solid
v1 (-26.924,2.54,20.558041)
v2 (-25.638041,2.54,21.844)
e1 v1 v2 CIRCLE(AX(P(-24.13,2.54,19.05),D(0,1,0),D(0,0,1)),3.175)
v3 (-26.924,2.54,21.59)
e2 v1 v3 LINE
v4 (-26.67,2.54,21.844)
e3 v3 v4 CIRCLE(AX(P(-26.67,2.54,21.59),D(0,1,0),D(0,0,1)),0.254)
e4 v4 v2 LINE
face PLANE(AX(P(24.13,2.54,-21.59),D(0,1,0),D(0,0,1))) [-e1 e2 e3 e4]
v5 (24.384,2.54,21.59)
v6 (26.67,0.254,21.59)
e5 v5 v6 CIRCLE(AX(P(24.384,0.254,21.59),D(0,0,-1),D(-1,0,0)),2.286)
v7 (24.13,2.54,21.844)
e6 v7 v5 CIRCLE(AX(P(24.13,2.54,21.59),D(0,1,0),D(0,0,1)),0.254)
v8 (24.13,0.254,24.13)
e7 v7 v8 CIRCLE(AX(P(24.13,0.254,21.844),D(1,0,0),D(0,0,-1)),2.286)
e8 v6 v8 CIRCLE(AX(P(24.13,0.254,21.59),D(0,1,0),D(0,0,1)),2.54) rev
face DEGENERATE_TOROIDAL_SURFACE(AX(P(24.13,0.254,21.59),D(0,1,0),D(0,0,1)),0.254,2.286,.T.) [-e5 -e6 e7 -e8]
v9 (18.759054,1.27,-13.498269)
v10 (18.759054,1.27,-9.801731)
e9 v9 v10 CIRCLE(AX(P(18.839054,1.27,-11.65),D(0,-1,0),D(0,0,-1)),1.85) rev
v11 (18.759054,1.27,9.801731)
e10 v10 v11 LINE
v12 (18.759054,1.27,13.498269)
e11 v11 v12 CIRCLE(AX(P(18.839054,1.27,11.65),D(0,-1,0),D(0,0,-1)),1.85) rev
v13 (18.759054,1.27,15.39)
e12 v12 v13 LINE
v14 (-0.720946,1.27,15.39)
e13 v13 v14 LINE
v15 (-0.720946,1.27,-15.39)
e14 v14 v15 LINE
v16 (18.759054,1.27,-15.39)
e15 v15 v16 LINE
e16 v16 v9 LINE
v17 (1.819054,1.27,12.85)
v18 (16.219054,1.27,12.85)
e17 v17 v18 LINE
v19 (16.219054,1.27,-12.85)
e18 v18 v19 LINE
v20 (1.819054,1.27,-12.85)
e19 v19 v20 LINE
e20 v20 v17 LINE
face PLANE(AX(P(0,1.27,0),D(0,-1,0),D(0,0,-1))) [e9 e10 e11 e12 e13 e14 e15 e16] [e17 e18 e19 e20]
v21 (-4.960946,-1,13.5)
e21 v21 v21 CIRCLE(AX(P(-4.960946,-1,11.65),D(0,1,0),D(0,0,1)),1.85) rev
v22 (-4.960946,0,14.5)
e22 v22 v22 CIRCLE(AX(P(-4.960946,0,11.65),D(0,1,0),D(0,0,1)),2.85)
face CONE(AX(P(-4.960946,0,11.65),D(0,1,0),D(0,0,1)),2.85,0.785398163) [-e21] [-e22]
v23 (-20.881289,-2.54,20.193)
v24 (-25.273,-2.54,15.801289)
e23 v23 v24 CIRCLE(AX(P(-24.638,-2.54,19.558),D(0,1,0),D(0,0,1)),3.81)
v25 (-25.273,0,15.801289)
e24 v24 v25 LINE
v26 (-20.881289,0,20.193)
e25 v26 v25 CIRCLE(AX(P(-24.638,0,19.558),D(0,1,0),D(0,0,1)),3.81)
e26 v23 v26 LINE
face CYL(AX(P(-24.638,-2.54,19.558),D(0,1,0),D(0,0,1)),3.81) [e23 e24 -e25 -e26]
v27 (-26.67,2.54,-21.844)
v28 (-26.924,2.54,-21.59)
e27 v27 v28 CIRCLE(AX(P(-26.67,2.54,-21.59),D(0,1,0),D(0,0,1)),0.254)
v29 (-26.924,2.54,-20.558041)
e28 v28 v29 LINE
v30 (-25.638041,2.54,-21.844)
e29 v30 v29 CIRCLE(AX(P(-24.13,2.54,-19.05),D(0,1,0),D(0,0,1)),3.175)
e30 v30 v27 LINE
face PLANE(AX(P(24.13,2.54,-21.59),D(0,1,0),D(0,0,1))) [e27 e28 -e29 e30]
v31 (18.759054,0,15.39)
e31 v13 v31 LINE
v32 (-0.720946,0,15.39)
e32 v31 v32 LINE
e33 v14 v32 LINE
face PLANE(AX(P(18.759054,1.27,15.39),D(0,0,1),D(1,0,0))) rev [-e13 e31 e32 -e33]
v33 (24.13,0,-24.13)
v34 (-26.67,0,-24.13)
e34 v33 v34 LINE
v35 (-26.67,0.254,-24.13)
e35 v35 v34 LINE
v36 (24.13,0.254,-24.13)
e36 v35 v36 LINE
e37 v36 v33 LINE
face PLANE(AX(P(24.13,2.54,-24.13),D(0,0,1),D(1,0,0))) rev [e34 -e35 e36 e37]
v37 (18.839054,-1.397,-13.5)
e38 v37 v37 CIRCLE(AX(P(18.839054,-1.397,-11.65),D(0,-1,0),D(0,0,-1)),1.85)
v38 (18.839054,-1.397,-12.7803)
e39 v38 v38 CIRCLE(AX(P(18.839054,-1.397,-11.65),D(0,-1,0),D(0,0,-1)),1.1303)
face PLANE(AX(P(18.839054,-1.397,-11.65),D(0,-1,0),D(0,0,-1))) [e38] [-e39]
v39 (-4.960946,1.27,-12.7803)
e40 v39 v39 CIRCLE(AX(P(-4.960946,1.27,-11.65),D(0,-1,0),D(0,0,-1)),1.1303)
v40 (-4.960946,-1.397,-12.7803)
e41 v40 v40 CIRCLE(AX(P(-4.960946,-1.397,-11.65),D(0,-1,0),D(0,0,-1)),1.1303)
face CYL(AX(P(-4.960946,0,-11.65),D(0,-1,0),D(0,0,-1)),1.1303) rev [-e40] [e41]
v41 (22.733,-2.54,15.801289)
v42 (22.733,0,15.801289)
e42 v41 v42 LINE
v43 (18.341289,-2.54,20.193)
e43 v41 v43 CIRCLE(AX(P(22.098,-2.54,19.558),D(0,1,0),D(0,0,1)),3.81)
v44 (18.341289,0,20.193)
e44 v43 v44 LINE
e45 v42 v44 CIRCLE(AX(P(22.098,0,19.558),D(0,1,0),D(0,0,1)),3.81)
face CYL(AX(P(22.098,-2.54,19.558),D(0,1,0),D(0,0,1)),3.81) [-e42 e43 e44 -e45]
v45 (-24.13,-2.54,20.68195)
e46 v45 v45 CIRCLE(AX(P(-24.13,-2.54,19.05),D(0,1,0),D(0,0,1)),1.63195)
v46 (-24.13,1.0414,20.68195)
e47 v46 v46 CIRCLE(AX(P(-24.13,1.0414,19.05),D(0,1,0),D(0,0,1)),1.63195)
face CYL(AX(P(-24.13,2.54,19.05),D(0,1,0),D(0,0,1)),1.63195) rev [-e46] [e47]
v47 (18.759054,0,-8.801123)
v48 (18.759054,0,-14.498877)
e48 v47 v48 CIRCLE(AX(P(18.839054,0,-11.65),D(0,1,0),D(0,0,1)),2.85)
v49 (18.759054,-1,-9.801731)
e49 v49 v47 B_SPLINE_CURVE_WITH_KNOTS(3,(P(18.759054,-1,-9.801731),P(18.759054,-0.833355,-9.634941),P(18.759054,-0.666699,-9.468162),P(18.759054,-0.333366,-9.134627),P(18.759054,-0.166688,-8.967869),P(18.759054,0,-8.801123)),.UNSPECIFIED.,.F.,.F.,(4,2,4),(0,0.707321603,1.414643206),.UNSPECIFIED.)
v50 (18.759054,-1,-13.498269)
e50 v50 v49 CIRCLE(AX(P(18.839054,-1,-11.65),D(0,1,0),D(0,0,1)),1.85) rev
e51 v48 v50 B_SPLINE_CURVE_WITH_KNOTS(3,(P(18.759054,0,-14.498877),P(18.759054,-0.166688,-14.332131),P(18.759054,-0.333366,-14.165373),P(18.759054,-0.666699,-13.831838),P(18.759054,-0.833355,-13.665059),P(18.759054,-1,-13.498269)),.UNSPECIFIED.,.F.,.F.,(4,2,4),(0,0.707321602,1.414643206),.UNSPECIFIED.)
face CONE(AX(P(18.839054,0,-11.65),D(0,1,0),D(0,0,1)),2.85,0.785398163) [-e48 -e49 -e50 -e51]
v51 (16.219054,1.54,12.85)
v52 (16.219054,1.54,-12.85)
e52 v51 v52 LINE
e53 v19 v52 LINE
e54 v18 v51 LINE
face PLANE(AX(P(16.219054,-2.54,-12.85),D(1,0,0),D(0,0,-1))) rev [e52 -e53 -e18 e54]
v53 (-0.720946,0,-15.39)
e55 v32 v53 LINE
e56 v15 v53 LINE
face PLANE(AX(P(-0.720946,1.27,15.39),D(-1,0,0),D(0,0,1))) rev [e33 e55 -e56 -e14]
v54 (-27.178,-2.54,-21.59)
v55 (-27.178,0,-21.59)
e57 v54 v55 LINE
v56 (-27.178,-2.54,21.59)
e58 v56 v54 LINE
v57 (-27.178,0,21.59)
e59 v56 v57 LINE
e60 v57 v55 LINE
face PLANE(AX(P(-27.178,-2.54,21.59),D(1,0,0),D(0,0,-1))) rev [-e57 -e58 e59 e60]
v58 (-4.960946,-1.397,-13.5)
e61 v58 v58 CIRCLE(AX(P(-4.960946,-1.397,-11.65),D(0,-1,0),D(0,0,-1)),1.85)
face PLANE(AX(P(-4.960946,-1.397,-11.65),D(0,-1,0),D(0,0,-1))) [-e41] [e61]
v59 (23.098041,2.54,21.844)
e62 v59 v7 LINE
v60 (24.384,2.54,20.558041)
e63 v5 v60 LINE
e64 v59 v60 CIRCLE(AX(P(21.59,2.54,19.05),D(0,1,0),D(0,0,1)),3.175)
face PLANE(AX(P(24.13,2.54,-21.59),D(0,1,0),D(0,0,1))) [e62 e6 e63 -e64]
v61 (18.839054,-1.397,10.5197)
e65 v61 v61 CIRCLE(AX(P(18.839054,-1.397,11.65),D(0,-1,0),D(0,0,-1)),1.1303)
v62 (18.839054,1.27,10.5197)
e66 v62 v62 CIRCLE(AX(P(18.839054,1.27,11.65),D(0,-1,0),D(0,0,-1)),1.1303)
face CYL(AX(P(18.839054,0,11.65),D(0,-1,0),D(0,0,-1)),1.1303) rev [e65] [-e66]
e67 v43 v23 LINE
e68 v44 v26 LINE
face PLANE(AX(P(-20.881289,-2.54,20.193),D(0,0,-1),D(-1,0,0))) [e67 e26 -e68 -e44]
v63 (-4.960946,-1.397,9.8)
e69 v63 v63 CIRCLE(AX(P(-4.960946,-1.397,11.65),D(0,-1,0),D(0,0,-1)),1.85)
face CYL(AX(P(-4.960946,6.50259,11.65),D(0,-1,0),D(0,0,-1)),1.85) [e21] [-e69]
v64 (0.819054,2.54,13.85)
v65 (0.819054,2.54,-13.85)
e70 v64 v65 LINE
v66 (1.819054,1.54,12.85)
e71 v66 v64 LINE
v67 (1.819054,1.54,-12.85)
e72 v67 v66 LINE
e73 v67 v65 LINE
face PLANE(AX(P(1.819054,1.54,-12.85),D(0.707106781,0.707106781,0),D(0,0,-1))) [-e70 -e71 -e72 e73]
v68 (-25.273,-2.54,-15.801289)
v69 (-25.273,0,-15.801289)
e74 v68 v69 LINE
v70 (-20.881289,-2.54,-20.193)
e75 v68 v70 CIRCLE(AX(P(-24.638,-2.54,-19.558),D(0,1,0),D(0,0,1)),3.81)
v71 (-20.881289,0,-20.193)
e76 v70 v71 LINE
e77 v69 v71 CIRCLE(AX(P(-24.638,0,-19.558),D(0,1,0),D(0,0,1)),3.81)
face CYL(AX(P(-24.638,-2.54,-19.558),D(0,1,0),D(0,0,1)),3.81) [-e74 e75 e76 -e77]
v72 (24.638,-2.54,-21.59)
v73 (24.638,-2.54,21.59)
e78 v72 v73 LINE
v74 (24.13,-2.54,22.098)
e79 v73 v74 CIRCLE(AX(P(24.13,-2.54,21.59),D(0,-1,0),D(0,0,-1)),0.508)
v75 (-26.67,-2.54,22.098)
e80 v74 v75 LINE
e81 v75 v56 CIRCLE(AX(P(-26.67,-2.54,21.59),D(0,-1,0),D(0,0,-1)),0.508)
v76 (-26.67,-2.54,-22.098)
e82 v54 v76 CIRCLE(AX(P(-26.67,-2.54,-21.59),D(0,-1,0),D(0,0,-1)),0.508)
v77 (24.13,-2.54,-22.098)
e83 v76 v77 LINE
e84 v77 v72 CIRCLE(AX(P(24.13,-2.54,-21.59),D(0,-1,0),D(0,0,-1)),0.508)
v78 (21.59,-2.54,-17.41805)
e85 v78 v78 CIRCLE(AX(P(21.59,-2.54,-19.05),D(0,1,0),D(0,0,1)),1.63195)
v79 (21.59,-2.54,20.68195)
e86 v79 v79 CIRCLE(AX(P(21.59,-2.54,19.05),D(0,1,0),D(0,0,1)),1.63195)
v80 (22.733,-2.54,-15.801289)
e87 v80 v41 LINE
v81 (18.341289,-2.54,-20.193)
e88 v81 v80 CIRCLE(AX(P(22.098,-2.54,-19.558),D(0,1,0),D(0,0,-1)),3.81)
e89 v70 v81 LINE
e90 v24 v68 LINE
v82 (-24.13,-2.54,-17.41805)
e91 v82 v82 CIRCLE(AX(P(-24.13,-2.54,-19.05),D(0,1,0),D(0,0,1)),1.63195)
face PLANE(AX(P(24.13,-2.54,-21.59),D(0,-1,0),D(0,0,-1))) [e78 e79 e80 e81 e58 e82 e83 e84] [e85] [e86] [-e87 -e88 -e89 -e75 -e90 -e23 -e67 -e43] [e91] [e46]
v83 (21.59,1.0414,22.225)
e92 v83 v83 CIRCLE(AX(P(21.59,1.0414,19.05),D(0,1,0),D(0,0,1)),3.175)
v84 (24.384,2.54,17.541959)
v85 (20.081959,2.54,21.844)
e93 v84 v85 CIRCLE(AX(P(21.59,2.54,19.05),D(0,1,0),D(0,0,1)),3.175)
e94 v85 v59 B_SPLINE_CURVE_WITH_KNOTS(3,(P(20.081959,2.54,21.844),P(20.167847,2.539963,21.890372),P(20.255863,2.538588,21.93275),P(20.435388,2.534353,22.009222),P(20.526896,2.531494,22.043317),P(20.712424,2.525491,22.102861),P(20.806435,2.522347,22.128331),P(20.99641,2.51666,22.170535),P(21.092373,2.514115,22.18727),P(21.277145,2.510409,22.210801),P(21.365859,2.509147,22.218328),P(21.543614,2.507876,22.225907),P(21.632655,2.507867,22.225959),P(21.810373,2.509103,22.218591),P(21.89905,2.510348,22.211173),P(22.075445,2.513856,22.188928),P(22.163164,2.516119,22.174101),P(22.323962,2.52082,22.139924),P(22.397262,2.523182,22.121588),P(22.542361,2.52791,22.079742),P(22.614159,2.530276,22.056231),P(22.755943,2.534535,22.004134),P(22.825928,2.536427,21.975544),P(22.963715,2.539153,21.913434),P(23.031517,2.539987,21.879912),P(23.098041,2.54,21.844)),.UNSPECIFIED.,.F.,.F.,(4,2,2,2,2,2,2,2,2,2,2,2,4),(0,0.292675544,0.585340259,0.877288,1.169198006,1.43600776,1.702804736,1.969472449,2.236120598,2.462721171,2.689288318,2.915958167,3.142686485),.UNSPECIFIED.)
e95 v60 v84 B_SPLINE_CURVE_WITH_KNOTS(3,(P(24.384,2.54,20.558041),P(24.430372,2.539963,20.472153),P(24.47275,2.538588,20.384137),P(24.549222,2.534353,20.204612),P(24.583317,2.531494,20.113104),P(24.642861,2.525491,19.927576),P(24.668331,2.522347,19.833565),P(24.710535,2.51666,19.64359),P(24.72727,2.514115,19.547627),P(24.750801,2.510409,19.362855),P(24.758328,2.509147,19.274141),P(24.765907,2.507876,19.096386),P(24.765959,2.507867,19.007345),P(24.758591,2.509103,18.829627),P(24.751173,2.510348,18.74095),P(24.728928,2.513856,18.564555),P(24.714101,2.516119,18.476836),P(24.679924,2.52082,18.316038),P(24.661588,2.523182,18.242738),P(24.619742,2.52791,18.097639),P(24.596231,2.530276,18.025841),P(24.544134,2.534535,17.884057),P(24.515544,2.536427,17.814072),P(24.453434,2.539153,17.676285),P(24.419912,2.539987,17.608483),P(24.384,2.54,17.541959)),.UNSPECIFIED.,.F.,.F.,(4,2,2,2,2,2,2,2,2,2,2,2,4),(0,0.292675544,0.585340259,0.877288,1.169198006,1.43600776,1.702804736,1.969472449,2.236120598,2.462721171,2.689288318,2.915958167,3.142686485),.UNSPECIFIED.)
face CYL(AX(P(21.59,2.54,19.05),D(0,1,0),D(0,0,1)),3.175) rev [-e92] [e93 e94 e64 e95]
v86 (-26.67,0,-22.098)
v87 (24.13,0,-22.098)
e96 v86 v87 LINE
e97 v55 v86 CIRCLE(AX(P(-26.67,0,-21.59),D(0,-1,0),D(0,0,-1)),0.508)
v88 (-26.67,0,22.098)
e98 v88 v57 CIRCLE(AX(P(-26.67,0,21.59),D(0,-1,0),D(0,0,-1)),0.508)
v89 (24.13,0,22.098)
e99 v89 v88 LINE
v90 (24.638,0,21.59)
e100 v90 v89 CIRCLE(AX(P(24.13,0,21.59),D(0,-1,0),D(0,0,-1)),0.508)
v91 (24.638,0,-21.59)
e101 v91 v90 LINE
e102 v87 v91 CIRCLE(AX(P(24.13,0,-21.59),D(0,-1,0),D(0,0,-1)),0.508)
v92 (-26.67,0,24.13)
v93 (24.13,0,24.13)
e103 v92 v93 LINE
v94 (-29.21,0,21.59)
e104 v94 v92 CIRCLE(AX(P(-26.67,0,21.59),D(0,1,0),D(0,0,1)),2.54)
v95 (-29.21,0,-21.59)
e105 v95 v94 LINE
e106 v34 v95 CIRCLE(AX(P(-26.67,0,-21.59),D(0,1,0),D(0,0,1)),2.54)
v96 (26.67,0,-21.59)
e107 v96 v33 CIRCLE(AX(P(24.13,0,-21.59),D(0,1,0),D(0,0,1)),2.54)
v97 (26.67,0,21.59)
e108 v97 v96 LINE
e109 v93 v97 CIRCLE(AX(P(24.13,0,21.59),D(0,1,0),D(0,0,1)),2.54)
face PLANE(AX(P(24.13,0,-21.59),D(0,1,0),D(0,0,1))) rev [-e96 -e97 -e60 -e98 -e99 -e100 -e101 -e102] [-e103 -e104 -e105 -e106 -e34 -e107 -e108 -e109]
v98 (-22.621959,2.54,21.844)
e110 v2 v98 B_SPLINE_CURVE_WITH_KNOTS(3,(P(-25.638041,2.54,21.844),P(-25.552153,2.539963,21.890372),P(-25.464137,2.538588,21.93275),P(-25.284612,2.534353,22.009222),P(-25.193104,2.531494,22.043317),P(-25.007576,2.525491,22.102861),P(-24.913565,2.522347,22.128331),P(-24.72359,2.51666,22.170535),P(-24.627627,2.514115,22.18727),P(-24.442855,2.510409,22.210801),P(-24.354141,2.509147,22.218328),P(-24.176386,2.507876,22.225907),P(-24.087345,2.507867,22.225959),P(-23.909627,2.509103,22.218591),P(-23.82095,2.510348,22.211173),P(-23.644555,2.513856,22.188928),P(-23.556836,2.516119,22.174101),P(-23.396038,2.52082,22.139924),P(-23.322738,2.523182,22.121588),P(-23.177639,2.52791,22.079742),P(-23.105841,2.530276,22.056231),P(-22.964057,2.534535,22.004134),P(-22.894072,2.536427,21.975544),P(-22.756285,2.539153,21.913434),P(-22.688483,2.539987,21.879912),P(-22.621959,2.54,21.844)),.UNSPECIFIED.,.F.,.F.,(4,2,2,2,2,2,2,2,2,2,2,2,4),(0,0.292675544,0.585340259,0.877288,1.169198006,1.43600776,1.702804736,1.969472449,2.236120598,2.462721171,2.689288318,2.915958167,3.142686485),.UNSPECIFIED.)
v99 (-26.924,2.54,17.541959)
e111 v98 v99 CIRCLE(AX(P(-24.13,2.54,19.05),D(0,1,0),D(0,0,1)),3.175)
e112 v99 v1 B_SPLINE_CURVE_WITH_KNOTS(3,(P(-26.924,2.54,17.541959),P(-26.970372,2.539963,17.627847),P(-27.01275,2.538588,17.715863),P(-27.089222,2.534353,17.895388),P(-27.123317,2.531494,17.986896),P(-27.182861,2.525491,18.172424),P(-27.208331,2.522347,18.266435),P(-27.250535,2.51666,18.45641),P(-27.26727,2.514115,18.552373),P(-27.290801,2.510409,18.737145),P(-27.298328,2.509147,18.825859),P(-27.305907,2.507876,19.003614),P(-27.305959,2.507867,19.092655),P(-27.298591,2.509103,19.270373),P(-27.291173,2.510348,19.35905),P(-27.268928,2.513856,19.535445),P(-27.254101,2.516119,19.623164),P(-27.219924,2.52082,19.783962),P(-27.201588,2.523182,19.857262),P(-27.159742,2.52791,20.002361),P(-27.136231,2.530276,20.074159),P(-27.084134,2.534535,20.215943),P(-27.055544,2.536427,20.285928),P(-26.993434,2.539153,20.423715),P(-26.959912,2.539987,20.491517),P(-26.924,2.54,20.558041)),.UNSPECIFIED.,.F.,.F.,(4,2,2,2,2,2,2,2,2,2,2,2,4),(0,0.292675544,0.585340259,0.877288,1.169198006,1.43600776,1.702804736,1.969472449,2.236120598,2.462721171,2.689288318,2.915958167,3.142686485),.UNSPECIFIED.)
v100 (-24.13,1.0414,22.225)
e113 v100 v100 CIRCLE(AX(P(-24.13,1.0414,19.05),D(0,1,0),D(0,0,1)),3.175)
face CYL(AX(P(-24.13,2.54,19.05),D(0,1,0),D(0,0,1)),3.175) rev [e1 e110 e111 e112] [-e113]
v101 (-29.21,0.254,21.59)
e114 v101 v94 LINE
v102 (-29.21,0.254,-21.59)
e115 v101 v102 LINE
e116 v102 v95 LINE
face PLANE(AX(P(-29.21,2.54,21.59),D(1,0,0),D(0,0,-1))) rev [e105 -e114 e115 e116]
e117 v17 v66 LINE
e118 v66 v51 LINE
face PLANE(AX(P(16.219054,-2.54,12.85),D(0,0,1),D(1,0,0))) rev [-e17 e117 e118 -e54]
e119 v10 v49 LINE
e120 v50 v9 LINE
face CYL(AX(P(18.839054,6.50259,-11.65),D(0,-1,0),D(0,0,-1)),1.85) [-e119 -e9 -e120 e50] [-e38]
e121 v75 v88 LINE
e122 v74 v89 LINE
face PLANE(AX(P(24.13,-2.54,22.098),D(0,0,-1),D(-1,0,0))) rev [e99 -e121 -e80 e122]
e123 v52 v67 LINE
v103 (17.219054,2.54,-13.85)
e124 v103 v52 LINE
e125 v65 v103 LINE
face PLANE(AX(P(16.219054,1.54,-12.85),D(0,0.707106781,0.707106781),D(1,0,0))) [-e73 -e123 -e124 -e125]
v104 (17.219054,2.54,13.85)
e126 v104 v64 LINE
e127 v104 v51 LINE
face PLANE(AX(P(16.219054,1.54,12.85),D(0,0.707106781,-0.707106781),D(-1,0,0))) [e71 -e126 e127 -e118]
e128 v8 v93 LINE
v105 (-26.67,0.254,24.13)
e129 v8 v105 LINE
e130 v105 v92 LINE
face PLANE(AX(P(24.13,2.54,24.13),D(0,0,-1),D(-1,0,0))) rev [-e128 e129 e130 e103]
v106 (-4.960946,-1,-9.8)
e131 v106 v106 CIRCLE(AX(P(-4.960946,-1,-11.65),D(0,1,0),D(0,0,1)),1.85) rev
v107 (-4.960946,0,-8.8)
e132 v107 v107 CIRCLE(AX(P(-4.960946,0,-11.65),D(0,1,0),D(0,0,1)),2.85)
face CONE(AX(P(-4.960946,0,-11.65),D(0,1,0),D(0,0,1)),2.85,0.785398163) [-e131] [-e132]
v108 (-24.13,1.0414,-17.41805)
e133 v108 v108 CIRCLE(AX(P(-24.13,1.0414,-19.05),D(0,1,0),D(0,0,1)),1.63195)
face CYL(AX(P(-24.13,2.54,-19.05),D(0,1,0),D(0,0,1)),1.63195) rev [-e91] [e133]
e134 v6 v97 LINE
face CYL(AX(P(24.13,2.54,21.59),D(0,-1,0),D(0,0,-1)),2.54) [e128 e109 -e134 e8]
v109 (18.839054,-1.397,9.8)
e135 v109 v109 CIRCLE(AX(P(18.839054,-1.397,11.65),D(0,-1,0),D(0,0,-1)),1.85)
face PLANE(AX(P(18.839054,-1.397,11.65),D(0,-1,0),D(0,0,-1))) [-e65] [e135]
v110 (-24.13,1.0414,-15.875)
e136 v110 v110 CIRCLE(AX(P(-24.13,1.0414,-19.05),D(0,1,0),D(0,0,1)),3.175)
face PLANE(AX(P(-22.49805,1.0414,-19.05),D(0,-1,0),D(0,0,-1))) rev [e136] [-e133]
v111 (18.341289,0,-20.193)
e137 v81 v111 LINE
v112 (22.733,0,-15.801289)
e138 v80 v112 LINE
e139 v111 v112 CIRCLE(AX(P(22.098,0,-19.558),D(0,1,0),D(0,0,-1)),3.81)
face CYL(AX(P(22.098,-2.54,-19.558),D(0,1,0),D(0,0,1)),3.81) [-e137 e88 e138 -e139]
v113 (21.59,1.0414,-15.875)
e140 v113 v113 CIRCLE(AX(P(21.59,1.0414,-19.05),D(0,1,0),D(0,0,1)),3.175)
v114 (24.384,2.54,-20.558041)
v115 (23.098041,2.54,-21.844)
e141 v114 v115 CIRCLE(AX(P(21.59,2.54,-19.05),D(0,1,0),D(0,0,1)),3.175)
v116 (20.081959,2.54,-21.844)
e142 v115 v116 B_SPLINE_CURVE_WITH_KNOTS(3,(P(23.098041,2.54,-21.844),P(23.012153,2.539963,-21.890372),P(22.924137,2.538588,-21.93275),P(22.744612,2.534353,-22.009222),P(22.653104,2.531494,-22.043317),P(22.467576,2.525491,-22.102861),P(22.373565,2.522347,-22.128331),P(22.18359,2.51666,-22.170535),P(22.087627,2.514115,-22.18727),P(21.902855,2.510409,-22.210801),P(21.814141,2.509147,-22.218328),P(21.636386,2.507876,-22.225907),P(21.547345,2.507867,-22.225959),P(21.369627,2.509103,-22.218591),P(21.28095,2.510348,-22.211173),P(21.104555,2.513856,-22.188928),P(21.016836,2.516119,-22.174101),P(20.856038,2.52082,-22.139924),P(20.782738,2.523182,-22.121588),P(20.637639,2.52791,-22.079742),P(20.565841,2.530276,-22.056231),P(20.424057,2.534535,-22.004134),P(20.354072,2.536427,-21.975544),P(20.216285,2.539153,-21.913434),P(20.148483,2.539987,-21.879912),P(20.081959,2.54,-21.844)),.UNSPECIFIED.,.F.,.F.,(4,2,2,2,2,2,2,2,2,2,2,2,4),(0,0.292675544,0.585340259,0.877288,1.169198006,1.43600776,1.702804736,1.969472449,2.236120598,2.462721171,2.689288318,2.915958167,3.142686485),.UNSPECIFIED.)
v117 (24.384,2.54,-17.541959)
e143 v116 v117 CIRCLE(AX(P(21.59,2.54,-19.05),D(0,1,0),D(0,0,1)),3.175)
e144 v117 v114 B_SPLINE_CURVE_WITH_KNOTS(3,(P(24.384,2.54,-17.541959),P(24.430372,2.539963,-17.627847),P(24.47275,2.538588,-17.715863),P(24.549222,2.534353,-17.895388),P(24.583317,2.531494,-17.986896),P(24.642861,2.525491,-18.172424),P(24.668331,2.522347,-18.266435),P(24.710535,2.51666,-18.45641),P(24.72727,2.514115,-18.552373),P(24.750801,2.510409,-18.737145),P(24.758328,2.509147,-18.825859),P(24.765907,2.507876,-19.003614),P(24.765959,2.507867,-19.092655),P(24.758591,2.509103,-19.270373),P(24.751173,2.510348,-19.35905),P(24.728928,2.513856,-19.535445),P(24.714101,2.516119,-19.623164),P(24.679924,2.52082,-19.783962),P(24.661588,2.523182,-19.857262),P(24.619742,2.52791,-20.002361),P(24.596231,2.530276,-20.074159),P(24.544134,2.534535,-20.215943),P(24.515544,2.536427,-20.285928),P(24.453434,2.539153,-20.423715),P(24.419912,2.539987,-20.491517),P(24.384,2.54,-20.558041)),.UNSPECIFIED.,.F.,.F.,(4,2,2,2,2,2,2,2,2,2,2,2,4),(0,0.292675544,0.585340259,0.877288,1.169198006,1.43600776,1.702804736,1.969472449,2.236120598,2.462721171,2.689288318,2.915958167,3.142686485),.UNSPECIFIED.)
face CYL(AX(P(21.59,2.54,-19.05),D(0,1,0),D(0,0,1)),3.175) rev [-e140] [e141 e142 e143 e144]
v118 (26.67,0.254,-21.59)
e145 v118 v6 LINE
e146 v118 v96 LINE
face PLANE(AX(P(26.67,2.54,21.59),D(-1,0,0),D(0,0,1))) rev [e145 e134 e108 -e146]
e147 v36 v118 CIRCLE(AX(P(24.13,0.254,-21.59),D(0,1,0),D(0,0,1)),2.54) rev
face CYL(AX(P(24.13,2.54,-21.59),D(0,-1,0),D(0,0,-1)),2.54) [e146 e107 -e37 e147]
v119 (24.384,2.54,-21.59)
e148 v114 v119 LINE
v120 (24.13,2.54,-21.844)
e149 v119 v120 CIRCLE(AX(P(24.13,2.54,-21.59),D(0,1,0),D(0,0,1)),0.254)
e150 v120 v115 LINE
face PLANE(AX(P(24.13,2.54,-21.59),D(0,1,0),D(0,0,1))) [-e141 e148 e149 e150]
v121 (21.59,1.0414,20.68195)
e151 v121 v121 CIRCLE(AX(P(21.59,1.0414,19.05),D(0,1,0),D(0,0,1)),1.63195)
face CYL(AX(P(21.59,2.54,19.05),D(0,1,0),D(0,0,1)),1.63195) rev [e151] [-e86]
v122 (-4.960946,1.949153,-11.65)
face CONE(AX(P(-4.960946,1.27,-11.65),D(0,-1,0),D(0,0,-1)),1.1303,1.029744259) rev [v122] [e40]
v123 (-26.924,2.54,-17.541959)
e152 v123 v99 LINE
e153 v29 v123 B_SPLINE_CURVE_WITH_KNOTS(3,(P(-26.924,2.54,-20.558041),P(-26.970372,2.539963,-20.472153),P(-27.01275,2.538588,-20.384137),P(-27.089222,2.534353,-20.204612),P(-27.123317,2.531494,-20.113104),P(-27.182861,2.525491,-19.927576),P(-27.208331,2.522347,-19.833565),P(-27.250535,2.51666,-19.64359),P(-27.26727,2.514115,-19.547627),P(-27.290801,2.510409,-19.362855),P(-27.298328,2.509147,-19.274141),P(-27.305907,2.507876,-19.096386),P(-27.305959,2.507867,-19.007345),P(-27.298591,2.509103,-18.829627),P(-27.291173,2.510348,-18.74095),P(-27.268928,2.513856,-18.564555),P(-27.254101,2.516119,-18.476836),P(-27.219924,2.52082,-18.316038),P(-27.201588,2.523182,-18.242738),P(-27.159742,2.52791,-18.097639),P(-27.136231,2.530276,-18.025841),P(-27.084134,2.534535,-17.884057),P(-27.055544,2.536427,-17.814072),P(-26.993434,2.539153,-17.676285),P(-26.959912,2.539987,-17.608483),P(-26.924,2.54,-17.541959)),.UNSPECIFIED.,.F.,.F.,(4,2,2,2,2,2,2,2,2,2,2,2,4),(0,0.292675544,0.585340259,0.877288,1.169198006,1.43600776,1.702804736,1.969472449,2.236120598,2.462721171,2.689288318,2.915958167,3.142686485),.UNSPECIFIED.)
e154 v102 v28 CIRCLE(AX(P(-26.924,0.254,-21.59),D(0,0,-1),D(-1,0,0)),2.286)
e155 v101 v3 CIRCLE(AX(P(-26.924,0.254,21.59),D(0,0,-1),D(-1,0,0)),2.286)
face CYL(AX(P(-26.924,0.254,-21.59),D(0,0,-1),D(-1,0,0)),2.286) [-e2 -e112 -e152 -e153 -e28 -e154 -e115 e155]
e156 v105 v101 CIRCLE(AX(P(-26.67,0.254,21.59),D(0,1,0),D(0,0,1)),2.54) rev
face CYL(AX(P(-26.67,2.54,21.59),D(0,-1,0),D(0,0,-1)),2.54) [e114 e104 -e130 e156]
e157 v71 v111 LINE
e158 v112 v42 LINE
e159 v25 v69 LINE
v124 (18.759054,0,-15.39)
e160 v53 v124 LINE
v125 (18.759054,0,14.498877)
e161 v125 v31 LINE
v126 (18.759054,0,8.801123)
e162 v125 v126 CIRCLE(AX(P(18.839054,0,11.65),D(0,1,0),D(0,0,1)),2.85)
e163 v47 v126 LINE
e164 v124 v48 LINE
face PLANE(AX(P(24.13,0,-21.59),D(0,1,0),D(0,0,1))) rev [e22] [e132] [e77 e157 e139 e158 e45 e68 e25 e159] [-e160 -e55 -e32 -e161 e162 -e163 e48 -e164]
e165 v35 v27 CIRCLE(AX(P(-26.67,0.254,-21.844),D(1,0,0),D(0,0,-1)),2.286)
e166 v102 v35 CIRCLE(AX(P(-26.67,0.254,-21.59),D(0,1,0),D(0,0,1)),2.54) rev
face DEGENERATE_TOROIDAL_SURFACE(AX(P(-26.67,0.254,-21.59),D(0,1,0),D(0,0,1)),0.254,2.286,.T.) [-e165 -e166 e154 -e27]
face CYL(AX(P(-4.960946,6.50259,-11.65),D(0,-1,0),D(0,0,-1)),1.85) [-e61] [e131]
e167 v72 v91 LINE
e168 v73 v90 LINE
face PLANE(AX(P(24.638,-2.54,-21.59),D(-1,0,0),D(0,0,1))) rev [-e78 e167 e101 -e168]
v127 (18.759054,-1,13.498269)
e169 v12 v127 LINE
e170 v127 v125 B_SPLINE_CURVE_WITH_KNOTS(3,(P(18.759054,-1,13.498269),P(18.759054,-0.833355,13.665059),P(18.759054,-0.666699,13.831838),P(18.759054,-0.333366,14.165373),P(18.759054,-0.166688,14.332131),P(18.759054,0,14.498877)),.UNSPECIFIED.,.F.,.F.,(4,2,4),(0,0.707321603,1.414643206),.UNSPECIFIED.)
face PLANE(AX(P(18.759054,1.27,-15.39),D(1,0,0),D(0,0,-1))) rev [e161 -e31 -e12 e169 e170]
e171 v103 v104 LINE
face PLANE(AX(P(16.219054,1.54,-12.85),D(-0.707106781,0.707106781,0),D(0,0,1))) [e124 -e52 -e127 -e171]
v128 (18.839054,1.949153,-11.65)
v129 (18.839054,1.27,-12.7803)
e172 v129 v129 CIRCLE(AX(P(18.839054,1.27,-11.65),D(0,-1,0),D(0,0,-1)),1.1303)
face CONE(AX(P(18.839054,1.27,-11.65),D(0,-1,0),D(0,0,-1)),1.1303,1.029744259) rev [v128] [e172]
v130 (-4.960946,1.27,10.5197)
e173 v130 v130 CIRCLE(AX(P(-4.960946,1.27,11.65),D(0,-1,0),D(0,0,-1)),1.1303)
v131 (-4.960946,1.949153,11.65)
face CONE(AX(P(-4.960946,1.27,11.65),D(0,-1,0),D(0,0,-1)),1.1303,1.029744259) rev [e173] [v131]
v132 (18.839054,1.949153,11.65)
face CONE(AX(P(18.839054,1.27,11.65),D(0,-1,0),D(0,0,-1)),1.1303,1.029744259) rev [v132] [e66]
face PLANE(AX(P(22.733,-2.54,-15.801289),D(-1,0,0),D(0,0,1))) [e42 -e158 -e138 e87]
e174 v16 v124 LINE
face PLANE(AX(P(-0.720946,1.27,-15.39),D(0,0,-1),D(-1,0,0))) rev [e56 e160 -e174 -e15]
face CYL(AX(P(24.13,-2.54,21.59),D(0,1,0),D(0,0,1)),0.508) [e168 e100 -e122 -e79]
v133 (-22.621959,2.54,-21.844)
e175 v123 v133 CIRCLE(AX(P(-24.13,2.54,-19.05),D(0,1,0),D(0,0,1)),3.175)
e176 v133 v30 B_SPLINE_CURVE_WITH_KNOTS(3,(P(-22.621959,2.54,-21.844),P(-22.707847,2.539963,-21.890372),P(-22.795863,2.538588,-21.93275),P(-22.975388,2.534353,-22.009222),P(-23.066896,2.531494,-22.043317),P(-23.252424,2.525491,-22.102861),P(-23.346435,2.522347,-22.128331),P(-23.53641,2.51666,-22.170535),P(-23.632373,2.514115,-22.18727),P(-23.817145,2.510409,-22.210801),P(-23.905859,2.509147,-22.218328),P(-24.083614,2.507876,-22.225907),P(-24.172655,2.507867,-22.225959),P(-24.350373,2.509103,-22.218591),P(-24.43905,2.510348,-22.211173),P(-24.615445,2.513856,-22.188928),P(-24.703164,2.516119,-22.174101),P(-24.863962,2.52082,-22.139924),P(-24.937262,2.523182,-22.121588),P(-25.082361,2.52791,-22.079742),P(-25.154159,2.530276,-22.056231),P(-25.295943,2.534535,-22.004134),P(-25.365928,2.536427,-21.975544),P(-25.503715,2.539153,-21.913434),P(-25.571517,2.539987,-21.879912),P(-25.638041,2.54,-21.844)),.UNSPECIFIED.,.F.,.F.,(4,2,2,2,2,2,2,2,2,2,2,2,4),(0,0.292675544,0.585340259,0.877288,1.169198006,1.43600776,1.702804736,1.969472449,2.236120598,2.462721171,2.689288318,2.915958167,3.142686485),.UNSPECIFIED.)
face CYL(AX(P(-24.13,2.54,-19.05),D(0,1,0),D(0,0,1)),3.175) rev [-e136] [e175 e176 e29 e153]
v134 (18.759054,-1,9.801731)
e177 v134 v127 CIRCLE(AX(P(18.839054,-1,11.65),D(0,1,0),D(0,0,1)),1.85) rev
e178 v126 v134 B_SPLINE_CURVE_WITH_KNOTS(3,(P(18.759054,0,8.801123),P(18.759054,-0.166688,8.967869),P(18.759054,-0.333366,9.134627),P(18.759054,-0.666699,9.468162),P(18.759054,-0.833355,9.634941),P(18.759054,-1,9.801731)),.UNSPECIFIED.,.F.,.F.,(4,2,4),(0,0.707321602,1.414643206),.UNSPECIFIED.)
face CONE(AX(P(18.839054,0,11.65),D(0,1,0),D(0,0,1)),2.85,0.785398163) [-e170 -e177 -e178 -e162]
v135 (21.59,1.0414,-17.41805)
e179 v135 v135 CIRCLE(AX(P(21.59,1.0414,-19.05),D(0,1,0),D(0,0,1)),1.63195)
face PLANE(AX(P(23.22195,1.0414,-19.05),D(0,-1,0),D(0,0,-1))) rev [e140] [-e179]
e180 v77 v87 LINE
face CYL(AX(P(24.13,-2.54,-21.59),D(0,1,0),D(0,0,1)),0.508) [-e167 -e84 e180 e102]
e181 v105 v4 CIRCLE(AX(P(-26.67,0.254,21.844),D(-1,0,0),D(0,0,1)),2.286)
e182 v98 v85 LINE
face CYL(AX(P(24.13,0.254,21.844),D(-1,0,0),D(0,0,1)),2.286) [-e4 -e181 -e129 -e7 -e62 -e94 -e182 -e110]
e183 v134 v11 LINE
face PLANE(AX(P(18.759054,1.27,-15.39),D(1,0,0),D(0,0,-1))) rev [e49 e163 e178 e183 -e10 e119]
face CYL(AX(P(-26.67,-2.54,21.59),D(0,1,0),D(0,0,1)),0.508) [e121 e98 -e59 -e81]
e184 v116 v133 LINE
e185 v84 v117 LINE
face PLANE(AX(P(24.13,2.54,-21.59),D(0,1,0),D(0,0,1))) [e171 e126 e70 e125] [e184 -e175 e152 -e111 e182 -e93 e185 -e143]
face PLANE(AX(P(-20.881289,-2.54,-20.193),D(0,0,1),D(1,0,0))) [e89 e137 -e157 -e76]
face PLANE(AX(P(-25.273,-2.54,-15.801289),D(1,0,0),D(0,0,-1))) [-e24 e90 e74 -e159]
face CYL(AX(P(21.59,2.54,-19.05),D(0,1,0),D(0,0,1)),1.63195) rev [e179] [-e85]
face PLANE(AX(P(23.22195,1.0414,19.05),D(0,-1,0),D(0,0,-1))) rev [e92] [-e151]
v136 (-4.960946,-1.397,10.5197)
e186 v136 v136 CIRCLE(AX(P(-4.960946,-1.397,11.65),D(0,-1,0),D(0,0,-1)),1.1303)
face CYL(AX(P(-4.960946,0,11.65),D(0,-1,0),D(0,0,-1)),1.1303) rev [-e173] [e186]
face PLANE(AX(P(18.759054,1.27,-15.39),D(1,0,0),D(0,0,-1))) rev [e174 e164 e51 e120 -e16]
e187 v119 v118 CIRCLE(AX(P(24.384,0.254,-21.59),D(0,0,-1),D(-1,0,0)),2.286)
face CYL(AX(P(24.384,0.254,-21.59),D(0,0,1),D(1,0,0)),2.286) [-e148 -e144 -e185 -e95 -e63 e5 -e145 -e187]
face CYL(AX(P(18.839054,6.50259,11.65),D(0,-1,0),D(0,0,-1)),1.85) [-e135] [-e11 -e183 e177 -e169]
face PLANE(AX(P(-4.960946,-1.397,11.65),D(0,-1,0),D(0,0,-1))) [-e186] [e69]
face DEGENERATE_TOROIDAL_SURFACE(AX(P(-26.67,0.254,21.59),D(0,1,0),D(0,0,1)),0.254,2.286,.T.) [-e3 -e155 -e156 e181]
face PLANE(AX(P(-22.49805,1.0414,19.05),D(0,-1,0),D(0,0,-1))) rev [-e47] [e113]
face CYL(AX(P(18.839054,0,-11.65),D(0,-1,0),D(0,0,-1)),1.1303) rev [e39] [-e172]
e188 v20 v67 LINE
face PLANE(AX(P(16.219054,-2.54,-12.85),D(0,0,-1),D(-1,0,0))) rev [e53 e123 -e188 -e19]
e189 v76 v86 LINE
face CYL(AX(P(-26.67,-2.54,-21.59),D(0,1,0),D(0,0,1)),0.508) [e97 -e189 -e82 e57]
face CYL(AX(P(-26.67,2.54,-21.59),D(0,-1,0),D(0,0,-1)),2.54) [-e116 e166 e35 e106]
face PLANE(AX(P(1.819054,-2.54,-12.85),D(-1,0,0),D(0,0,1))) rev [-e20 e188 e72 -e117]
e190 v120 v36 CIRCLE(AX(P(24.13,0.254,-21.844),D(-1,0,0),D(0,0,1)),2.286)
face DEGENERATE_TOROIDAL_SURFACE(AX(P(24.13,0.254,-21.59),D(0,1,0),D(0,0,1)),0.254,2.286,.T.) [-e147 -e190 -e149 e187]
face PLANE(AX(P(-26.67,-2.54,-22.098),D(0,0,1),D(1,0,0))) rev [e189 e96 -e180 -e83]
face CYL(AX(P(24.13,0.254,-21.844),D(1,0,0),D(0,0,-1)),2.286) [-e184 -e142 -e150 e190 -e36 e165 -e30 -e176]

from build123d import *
from build123d.topology import SkipClean

# Parameters (mm, degrees)
BOSS_EXTRUDE1_DEPTH                           = 2.54
BOSS_EXTRUDE2_DEPTH                           = 2.54
FILLET1_R                                     = 2.286
CBORE_FOR_4_BUTTON_HEAD_CAP_SCREW_D           = 3.2639
CBORE_FOR_4_BUTTON_HEAD_CAP_SCREW_CBORE_D     = 6.35
CBORE_FOR_4_BUTTON_HEAD_CAP_SCREW_CBORE_DEPTH = 1.4986
SKETCH6_W                                     = 14.4
SKETCH6_H                                     = 25.7
CUT_EXTRUDE1_DEPTH                            = 244.87875068
SKETCH7_W                                     = 19.48
SKETCH7_H                                     = 30.78
CUT_EXTRUDE2_DEPTH                            = 1.27
CHAMFER1_SIZE                                 = 1
F_4_40_TAPPED_HOLE1_D                         = 2.2606
F_4_40_TAPPED_HOLE1_DEPTH                     = 1.27
F_4_40_TAPPED_HOLE1_TIP                       = 0.679152758
BOSS_EXTRUDE3_START                           = -2
BOSS_EXTRUDE3_OUTLINE_R                       = 1.85
BOSS_EXTRUDE3_OUTLINE_R_2                     = 1.1303
BOSS_EXTRUDE3_DEPTH                           = 3.397
CHAMFER2_SIZE                                 = 1


with BuildPart() as part:
    # Sketch1 → Boss-Extrude1 (new body)
    with BuildSketch(Plane(origin=(0, 0, 0), x_dir=(1, 0, 0), z_dir=(0, 1, 0))):
        with BuildLine():
            Line((24.13, 24.13), (-26.67, 24.13))
            ThreePointArc((-26.67, 24.13), (-28.466051224, 23.386051224), (-29.21, 21.59))
            Line((-29.21, 21.59), (-29.21, -21.59))
            ThreePointArc((-29.21, -21.59), (-28.466051224, -23.386051224), (-26.67, -24.13))
            Line((-26.67, -24.13), (24.13, -24.13))
            ThreePointArc((24.13, -24.13), (25.926051224, -23.386051224), (26.67, -21.59))
            Line((26.67, -21.59), (26.67, 21.59))
            ThreePointArc((26.67, 21.59), (25.926051224, 23.386051224), (24.13, 24.13))
        make_face()
    extrude(amount=BOSS_EXTRUDE1_DEPTH)

    # Sketch3 → Boss-Extrude2 (add)
    with BuildSketch(Plane.XZ):
        with BuildLine():
            Line((24.638, -21.59), (24.638, 21.59))
            ThreePointArc((24.638, 21.59), (24.489210245, 21.949210245), (24.13, 22.098))
            Line((24.13, 22.098), (-26.67, 22.098))
            ThreePointArc((-26.67, 22.098), (-27.029210245, 21.949210245), (-27.178, 21.59))
            Line((-27.178, 21.59), (-27.178, -21.59))
            ThreePointArc((-27.178, -21.59), (-27.029210245, -21.949210245), (-26.67, -22.098))
            Line((-26.67, -22.098), (24.13, -22.098))
            ThreePointArc((24.13, -22.098), (24.489210245, -21.949210245), (24.638, -21.59))
        make_face()
        with BuildLine():
            Line((-20.881289338, -20.193), (18.341289338, -20.193))
            ThreePointArc((18.341289338, -20.193), (19.403923164, -16.863923164), (22.733, -15.801289338))
            Line((22.733, -15.801289338), (22.733, 15.801289338))
            ThreePointArc((22.733, 15.801289338), (19.403923164, 16.863923164), (18.341289338, 20.193))
            Line((18.341289338, 20.193), (-20.881289338, 20.193))
            ThreePointArc((-20.881289338, 20.193), (-21.943923164, 16.863923164), (-25.273, 15.801289338))
            Line((-25.273, 15.801289338), (-25.273, -15.801289338))
            ThreePointArc((-25.273, -15.801289338), (-21.943923164, -16.863923164), (-20.881289338, -20.193))
        make_face(mode=Mode.SUBTRACT)
    extrude(amount=BOSS_EXTRUDE2_DEPTH)

    # Fillet1
    fillet1_edges = [part.edges().sort_by_distance(p)[0] for p in [
        (-28.466051224, 2.54, -23.386051224),
        (-29.21, 2.54, 0),
        (-28.466051224, 2.54, 23.386051224),
        (-1.27, 2.54, 24.13),
        (25.926051224, 2.54, 23.386051224),
        (26.67, 2.54, 0),
        (25.926051224, 2.54, -23.386051224),
        (-1.27, 2.54, -24.13),
    ]]
    fillet(fillet1_edges, radius=FILLET1_R)

    # CBORE for #4 Button Head Cap Screw (through all)
    with Locations(Plane(origin=(107.325337048, 2.54, -177.882723122), x_dir=(1, 0, 0), z_dir=(0, 1, 0))):
        with Locations((-85.735337048, -158.832723122), (-85.735337048, -196.932723122), (-131.455337048, -158.832723122), (-131.455337048, -196.932723122)):
            CounterBoreHole(CBORE_FOR_4_BUTTON_HEAD_CAP_SCREW_D / 2, CBORE_FOR_4_BUTTON_HEAD_CAP_SCREW_CBORE_D / 2, CBORE_FOR_4_BUTTON_HEAD_CAP_SCREW_CBORE_DEPTH)

    # Sketch6 → Cut-Extrude1 (cut, through all)
    with BuildSketch(Plane(origin=(107.325337048, 2.54, -177.882723122), x_dir=(-1, 0, 0), z_dir=(0, 1, 0))):
        with Locations((98.306283227, 177.882723122)):
            Rectangle(SKETCH6_W, SKETCH6_H)
    extrude(amount=-CUT_EXTRUDE1_DEPTH, mode=Mode.SUBTRACT)

    # Sketch7 → Cut-Extrude2 (cut)
    with BuildSketch(Plane.XZ):
        with Locations((9.019053821, 0)):
            Rectangle(SKETCH7_W, SKETCH7_H)
    extrude(amount=-CUT_EXTRUDE2_DEPTH, mode=Mode.SUBTRACT)

    # Chamfer1
    chamfer1_edges = [part.edges().sort_by_distance(p)[0] for p in [
        (16.219053821, 2.54, 0),
        (9.019053821, 2.54, -12.85),
        (1.819053821, 2.54, 0),
        (9.019053821, 2.54, 12.85),
    ]]
    chamfer(chamfer1_edges, length=CHAMFER1_SIZE)

    # #4-40 Tapped Hole1
    with Locations(Plane(origin=(107.325337048, 0, -177.882723122), x_dir=(-1, 0, 0), z_dir=(0, -1, 0))):
        with Locations((88.486283227, -189.532723122), (88.486283227, -166.232723122), (112.286283227, -166.232723122), (112.286283227, -189.532723122)):
            Hole(F_4_40_TAPPED_HOLE1_D / 2, depth=F_4_40_TAPPED_HOLE1_DEPTH)
            with Locations((0, 0, -(F_4_40_TAPPED_HOLE1_DEPTH + F_4_40_TAPPED_HOLE1_TIP / 2))):  # 118° drill point
                Cone(0, F_4_40_TAPPED_HOLE1_D / 2, F_4_40_TAPPED_HOLE1_TIP, mode=Mode.SUBTRACT)

    # Boss-Extrude3: read off the stored shape, not the designer's step
    # Boss-Extrude3 outline → Boss-Extrude3 (add)
    # profile 1 of 4: a face of its own
    with SkipClean():  # the faces are left unmerged after this step: merging them gives an invalid solid
        with BuildSketch(Plane.XZ.offset(BOSS_EXTRUDE3_START)):
            with Locations((18.839053821, 11.65)):
                Circle(BOSS_EXTRUDE3_OUTLINE_R)
            with Locations((18.839053821, 11.65)):
                Circle(BOSS_EXTRUDE3_OUTLINE_R_2, mode=Mode.SUBTRACT)
        # profile 2 of 4: a face of its own
        with BuildSketch(Plane.XZ.offset(BOSS_EXTRUDE3_START)):
            with Locations((18.839053821, -11.65)):
                Circle(BOSS_EXTRUDE3_OUTLINE_R)
            with Locations((18.839053821, -11.65)):
                Circle(BOSS_EXTRUDE3_OUTLINE_R_2, mode=Mode.SUBTRACT)
        # profile 3 of 4: a face of its own
        with BuildSketch(Plane.XZ.offset(BOSS_EXTRUDE3_START)):
            with Locations((-4.960946179, -11.65)):
                Circle(BOSS_EXTRUDE3_OUTLINE_R)
            with Locations((-4.960946179, -11.65)):
                Circle(BOSS_EXTRUDE3_OUTLINE_R_2, mode=Mode.SUBTRACT)
        # profile 4 of 4: a face of its own
        with BuildSketch(Plane.XZ.offset(BOSS_EXTRUDE3_START)):
            with Locations((-4.960946179, 11.65)):
                Circle(BOSS_EXTRUDE3_OUTLINE_R)
            with Locations((-4.960946179, 11.65)):
                Circle(BOSS_EXTRUDE3_OUTLINE_R_2, mode=Mode.SUBTRACT)
        extrude(amount=BOSS_EXTRUDE3_DEPTH)

    # Chamfer2
    chamfer2_edges = [part.edges().sort_by_distance(p)[0] for p in [
        (20.118604523, 0, 10.313867522),
        (20.118604523, 0, -12.986132478),
        (-6.810946179, 0, -11.65),
        (-6.810946179, 0, 11.65),
    ]]
    chamfer(chamfer2_edges, length=CHAMFER2_SIZE)


solid = part.part
